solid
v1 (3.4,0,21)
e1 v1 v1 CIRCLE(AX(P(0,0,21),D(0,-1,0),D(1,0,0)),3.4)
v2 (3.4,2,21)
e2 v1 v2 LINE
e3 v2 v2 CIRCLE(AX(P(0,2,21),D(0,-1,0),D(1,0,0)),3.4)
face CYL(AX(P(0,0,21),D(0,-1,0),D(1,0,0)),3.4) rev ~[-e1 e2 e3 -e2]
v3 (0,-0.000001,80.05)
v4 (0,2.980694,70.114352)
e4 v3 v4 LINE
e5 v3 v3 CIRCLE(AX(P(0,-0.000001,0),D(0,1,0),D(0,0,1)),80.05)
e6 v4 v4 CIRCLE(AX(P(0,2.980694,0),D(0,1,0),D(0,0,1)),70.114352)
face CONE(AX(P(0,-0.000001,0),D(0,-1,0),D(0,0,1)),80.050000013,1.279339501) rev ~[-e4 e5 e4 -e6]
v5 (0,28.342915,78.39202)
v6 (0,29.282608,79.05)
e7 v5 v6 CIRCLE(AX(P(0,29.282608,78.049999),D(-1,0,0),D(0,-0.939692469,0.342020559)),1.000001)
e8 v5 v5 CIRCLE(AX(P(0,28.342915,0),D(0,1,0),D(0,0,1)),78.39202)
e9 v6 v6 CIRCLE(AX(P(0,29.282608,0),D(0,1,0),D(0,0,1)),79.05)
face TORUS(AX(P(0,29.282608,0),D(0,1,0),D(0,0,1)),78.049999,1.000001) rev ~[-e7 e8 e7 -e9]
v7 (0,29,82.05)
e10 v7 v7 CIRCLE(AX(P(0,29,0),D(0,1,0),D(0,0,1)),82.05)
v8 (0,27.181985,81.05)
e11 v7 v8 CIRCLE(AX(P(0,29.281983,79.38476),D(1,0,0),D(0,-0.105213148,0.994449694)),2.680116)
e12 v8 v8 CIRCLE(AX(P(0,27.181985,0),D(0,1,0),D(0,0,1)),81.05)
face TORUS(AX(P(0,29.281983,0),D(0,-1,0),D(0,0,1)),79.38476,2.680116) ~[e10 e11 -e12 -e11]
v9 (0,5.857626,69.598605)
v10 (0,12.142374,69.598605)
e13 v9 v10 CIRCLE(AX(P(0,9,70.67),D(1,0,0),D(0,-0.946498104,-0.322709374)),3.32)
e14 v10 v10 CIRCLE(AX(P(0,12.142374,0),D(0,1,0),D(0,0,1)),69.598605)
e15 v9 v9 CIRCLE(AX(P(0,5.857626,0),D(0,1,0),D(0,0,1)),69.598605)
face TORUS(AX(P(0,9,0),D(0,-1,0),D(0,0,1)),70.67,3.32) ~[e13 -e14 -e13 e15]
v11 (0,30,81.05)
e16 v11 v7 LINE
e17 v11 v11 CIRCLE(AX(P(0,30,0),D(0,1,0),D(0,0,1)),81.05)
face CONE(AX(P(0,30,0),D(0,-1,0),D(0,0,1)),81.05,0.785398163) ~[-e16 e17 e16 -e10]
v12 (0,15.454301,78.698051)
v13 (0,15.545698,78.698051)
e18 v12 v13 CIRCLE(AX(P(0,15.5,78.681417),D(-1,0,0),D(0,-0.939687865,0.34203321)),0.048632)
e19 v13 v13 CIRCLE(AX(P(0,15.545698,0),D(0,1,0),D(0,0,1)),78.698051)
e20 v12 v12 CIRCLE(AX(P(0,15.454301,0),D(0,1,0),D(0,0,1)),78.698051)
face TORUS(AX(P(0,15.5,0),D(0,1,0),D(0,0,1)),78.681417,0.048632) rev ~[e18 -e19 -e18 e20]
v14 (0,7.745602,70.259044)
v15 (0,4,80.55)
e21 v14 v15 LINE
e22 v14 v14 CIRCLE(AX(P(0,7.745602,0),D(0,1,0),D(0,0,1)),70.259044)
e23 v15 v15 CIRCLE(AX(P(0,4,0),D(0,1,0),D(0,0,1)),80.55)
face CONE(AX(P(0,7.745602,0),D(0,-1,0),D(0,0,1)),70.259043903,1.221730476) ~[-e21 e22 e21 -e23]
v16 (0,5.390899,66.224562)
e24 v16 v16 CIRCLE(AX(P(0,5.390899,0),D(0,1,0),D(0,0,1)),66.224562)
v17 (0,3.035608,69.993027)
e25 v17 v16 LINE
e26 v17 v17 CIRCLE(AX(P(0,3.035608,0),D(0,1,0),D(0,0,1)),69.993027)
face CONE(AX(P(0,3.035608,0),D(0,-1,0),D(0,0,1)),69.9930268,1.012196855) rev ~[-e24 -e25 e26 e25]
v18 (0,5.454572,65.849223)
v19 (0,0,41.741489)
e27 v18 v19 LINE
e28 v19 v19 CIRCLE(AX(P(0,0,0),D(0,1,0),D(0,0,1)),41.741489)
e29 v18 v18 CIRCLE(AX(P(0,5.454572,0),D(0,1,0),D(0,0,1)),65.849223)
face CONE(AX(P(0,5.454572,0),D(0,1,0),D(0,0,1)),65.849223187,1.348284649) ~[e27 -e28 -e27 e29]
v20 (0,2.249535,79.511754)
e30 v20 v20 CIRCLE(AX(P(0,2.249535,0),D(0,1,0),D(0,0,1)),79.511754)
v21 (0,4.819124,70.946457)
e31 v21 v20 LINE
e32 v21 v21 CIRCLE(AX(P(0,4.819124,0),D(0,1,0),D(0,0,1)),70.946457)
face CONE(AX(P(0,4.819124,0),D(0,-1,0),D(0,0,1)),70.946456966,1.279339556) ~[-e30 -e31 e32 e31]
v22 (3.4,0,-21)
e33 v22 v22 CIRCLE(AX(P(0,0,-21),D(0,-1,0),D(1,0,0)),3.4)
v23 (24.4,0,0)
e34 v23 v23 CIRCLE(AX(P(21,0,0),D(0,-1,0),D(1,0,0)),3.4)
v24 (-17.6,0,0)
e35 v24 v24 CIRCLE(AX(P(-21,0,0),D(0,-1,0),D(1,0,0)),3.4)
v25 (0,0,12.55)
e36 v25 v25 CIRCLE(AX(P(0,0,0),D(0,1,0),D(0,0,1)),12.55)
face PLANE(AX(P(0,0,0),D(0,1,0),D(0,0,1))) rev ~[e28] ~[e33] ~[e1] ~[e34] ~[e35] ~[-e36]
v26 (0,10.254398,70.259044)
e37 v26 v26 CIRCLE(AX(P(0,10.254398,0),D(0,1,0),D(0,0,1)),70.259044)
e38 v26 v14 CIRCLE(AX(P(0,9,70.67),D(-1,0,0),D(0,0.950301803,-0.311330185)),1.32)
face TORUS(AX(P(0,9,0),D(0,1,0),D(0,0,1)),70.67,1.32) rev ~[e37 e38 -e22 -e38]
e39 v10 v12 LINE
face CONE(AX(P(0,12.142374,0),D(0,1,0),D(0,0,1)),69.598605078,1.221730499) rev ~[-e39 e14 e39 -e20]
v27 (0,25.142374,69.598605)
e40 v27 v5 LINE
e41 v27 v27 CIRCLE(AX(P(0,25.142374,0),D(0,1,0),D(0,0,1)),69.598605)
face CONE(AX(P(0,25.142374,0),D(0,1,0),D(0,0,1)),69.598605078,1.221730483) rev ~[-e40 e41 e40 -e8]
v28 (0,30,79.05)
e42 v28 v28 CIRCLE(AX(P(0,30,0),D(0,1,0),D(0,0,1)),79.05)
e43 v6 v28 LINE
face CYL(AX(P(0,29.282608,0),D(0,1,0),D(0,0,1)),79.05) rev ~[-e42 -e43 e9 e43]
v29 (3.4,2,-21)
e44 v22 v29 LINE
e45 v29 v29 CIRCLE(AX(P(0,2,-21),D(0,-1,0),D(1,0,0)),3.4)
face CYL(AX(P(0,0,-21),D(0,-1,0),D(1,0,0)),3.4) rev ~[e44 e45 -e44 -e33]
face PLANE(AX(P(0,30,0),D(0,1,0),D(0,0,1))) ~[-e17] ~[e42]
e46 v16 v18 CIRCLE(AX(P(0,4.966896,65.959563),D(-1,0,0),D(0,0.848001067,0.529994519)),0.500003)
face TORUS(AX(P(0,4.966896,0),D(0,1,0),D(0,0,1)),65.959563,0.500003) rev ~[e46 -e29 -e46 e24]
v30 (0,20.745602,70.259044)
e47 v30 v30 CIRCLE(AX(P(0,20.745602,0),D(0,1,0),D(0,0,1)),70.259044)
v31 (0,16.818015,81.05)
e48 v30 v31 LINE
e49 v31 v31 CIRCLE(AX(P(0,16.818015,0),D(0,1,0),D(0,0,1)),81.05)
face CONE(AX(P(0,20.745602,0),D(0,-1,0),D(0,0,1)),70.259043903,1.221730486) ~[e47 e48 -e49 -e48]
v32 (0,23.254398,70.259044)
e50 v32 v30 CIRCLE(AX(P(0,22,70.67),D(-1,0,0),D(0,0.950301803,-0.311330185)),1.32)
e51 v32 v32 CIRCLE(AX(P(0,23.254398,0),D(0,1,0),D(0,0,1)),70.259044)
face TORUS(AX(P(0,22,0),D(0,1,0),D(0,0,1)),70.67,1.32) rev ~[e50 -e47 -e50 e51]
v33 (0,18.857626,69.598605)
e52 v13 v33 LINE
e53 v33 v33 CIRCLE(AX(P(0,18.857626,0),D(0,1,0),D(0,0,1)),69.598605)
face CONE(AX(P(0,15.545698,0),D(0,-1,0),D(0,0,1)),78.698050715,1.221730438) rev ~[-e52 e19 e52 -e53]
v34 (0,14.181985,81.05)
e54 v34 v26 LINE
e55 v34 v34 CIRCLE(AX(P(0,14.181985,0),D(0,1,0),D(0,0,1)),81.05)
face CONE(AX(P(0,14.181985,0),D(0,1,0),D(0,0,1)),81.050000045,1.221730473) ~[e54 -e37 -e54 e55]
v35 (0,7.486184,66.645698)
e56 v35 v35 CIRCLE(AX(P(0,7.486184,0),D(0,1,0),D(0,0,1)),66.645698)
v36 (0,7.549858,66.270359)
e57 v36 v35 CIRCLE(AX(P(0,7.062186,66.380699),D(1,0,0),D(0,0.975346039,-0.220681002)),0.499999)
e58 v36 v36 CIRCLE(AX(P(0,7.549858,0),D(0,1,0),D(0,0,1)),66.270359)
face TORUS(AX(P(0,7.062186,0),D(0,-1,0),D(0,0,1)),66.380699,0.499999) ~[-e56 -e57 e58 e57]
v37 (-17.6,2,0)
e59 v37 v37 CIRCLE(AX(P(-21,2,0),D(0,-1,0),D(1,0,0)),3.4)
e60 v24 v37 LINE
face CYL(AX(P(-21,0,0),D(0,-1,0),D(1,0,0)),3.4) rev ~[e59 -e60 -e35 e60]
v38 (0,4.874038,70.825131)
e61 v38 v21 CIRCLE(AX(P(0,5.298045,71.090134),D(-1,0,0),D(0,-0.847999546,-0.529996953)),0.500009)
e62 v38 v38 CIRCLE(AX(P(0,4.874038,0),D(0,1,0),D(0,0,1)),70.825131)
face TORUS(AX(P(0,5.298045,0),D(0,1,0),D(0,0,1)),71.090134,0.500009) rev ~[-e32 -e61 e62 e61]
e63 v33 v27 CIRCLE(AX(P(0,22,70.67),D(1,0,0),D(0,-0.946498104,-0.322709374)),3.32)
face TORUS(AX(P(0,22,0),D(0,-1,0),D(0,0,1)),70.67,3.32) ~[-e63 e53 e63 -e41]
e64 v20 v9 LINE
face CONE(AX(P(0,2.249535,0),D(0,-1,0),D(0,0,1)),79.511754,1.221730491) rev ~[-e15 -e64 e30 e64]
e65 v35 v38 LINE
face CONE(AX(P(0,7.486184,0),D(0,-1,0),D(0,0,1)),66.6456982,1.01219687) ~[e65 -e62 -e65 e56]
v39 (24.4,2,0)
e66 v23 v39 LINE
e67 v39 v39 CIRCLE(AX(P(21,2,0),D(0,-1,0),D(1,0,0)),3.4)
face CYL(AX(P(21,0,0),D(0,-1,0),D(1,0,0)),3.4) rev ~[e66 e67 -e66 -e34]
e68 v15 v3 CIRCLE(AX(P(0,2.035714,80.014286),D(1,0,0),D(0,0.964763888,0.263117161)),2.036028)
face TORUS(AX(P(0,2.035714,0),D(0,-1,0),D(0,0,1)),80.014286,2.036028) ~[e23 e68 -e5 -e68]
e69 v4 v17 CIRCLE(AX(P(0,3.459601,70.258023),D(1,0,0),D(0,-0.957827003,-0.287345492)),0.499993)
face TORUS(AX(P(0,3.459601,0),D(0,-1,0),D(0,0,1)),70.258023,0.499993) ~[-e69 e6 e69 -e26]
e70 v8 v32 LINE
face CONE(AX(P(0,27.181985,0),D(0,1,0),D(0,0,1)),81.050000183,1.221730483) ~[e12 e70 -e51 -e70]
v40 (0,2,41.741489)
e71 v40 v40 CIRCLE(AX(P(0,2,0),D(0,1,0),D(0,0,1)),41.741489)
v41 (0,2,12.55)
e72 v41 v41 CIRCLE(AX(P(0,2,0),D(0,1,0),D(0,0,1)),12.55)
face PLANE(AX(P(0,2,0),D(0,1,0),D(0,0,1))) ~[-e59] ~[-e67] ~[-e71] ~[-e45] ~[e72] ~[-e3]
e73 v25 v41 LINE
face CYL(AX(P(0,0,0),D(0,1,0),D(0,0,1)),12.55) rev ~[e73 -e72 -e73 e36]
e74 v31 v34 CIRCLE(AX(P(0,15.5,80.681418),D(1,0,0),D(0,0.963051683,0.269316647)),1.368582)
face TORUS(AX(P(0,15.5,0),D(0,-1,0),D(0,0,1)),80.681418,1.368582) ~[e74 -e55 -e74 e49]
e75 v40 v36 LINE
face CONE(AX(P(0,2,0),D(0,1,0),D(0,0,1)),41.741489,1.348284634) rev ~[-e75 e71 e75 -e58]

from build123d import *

# Parameters (mm, degrees)
F2_R     = 3.4
F3_DEPTH = 30.001


# Not quite as in the source:
# - ends of sketch curves that miss each other by under 0.0002 mm in the source are joined


with BuildPart() as f1:
    # F0 (on Right) → F1 (revolve)
    with BuildSketch(Plane.YZ):
        with BuildLine():
            Line((0, 12.55), (2, 12.55))
            Line((2, 12.55), (2, 41.741489))
            Line((2, 41.741489), (7.549858, 66.270359))
            ThreePointArc((7.549858, 66.270359), (7.5551419421, 66.4643258691), (7.4861843205, 66.6456982003))
            Line((7.4861843205, 66.6456982003), (4.874038, 70.825131))
            ThreePointArc((4.874038, 70.825131), (4.8425235465, 70.8839575446), (4.8191238849, 70.9464569655))
            Line((4.8191238849, 70.9464569655), (2.249535, 79.511754))
            Line((2.249535, 79.511754), (5.857626, 69.598605))
            ThreePointArc((5.857626, 69.598605), (9, 67.35), (12.1423737717, 69.5986050779))
            Line((12.1423737717, 69.5986050779), (15.454301, 78.698051))
            ThreePointArc((15.454301, 78.698051), (15.5, 78.730049), (15.5456982162, 78.6980507147))
            Line((15.5456982162, 78.6980507147), (18.857626, 69.598605))
            ThreePointArc((18.857626, 69.598605), (22, 67.35), (25.1423737717, 69.5986050779))
            Line((25.1423737717, 69.5986050779), (28.342915, 78.39202))
            ThreePointArc((28.342915, 78.39202), (28.7090314554, 78.8691519685), (29.282608, 79.05))
            Line((29.282608, 79.05), (30, 79.05))
            Line((30, 79.05), (30, 81.05))
            Line((30, 81.05), (29, 82.05))
            ThreePointArc((29, 82.05), (27.9902948071, 81.733069934), (27.1819847697, 81.0500001826))
            Line((27.1819847697, 81.0500001826), (23.254398, 70.259044))
            ThreePointArc((23.254398, 70.259044), (22, 69.35), (20.7456017035, 70.2590439029))
            Line((20.7456017035, 70.2590439029), (16.818015, 81.05))
            ThreePointArc((16.818015, 81.05), (15.5, 82.05), (14.1819848382, 81.0500000452))
            Line((14.1819848382, 81.0500000452), (10.254398, 70.259044))
            ThreePointArc((10.254398, 70.259044), (9, 69.35), (7.7456017035, 70.2590439029))
            Line((7.7456017035, 70.2590439029), (4, 80.55))
            ThreePointArc((4, 80.55), (1.7831758422, 82.0345915451), (-7.457e-07, 80.0500000131))
            Line((-7.457e-07, 80.0500000131), (2.980694, 70.114352))
            ThreePointArc((2.980694, 70.114352), (3.0040933717, 70.0518529309), (3.0356076795, 69.9930267997))
            Line((3.0356076795, 69.9930267997), (5.390899, 66.224562))
            ThreePointArc((5.390899, 66.224562), (5.459855968, 66.0431897166), (5.454572175, 65.8492231867))
            Line((5.454572175, 65.8492231867), (0, 41.741489))
            Line((0, 41.741489), (0, 12.55))
        make_face()
    revolve(axis=Axis((0, 15, 0), (0, 1, 0)))

    # F2 (on Front) → F3 (cut, through all)
    with BuildSketch(Plane.XZ):
        with Locations((0, 21)):
            Circle(F2_R)
        with Locations((21, 0)):
            Circle(F2_R)
        with Locations((0, -21)):
            Circle(F2_R)
        with Locations((-21, 0)):
            Circle(F2_R)
    extrude(amount=-F3_DEPTH, mode=Mode.SUBTRACT)


solid = f1.part
